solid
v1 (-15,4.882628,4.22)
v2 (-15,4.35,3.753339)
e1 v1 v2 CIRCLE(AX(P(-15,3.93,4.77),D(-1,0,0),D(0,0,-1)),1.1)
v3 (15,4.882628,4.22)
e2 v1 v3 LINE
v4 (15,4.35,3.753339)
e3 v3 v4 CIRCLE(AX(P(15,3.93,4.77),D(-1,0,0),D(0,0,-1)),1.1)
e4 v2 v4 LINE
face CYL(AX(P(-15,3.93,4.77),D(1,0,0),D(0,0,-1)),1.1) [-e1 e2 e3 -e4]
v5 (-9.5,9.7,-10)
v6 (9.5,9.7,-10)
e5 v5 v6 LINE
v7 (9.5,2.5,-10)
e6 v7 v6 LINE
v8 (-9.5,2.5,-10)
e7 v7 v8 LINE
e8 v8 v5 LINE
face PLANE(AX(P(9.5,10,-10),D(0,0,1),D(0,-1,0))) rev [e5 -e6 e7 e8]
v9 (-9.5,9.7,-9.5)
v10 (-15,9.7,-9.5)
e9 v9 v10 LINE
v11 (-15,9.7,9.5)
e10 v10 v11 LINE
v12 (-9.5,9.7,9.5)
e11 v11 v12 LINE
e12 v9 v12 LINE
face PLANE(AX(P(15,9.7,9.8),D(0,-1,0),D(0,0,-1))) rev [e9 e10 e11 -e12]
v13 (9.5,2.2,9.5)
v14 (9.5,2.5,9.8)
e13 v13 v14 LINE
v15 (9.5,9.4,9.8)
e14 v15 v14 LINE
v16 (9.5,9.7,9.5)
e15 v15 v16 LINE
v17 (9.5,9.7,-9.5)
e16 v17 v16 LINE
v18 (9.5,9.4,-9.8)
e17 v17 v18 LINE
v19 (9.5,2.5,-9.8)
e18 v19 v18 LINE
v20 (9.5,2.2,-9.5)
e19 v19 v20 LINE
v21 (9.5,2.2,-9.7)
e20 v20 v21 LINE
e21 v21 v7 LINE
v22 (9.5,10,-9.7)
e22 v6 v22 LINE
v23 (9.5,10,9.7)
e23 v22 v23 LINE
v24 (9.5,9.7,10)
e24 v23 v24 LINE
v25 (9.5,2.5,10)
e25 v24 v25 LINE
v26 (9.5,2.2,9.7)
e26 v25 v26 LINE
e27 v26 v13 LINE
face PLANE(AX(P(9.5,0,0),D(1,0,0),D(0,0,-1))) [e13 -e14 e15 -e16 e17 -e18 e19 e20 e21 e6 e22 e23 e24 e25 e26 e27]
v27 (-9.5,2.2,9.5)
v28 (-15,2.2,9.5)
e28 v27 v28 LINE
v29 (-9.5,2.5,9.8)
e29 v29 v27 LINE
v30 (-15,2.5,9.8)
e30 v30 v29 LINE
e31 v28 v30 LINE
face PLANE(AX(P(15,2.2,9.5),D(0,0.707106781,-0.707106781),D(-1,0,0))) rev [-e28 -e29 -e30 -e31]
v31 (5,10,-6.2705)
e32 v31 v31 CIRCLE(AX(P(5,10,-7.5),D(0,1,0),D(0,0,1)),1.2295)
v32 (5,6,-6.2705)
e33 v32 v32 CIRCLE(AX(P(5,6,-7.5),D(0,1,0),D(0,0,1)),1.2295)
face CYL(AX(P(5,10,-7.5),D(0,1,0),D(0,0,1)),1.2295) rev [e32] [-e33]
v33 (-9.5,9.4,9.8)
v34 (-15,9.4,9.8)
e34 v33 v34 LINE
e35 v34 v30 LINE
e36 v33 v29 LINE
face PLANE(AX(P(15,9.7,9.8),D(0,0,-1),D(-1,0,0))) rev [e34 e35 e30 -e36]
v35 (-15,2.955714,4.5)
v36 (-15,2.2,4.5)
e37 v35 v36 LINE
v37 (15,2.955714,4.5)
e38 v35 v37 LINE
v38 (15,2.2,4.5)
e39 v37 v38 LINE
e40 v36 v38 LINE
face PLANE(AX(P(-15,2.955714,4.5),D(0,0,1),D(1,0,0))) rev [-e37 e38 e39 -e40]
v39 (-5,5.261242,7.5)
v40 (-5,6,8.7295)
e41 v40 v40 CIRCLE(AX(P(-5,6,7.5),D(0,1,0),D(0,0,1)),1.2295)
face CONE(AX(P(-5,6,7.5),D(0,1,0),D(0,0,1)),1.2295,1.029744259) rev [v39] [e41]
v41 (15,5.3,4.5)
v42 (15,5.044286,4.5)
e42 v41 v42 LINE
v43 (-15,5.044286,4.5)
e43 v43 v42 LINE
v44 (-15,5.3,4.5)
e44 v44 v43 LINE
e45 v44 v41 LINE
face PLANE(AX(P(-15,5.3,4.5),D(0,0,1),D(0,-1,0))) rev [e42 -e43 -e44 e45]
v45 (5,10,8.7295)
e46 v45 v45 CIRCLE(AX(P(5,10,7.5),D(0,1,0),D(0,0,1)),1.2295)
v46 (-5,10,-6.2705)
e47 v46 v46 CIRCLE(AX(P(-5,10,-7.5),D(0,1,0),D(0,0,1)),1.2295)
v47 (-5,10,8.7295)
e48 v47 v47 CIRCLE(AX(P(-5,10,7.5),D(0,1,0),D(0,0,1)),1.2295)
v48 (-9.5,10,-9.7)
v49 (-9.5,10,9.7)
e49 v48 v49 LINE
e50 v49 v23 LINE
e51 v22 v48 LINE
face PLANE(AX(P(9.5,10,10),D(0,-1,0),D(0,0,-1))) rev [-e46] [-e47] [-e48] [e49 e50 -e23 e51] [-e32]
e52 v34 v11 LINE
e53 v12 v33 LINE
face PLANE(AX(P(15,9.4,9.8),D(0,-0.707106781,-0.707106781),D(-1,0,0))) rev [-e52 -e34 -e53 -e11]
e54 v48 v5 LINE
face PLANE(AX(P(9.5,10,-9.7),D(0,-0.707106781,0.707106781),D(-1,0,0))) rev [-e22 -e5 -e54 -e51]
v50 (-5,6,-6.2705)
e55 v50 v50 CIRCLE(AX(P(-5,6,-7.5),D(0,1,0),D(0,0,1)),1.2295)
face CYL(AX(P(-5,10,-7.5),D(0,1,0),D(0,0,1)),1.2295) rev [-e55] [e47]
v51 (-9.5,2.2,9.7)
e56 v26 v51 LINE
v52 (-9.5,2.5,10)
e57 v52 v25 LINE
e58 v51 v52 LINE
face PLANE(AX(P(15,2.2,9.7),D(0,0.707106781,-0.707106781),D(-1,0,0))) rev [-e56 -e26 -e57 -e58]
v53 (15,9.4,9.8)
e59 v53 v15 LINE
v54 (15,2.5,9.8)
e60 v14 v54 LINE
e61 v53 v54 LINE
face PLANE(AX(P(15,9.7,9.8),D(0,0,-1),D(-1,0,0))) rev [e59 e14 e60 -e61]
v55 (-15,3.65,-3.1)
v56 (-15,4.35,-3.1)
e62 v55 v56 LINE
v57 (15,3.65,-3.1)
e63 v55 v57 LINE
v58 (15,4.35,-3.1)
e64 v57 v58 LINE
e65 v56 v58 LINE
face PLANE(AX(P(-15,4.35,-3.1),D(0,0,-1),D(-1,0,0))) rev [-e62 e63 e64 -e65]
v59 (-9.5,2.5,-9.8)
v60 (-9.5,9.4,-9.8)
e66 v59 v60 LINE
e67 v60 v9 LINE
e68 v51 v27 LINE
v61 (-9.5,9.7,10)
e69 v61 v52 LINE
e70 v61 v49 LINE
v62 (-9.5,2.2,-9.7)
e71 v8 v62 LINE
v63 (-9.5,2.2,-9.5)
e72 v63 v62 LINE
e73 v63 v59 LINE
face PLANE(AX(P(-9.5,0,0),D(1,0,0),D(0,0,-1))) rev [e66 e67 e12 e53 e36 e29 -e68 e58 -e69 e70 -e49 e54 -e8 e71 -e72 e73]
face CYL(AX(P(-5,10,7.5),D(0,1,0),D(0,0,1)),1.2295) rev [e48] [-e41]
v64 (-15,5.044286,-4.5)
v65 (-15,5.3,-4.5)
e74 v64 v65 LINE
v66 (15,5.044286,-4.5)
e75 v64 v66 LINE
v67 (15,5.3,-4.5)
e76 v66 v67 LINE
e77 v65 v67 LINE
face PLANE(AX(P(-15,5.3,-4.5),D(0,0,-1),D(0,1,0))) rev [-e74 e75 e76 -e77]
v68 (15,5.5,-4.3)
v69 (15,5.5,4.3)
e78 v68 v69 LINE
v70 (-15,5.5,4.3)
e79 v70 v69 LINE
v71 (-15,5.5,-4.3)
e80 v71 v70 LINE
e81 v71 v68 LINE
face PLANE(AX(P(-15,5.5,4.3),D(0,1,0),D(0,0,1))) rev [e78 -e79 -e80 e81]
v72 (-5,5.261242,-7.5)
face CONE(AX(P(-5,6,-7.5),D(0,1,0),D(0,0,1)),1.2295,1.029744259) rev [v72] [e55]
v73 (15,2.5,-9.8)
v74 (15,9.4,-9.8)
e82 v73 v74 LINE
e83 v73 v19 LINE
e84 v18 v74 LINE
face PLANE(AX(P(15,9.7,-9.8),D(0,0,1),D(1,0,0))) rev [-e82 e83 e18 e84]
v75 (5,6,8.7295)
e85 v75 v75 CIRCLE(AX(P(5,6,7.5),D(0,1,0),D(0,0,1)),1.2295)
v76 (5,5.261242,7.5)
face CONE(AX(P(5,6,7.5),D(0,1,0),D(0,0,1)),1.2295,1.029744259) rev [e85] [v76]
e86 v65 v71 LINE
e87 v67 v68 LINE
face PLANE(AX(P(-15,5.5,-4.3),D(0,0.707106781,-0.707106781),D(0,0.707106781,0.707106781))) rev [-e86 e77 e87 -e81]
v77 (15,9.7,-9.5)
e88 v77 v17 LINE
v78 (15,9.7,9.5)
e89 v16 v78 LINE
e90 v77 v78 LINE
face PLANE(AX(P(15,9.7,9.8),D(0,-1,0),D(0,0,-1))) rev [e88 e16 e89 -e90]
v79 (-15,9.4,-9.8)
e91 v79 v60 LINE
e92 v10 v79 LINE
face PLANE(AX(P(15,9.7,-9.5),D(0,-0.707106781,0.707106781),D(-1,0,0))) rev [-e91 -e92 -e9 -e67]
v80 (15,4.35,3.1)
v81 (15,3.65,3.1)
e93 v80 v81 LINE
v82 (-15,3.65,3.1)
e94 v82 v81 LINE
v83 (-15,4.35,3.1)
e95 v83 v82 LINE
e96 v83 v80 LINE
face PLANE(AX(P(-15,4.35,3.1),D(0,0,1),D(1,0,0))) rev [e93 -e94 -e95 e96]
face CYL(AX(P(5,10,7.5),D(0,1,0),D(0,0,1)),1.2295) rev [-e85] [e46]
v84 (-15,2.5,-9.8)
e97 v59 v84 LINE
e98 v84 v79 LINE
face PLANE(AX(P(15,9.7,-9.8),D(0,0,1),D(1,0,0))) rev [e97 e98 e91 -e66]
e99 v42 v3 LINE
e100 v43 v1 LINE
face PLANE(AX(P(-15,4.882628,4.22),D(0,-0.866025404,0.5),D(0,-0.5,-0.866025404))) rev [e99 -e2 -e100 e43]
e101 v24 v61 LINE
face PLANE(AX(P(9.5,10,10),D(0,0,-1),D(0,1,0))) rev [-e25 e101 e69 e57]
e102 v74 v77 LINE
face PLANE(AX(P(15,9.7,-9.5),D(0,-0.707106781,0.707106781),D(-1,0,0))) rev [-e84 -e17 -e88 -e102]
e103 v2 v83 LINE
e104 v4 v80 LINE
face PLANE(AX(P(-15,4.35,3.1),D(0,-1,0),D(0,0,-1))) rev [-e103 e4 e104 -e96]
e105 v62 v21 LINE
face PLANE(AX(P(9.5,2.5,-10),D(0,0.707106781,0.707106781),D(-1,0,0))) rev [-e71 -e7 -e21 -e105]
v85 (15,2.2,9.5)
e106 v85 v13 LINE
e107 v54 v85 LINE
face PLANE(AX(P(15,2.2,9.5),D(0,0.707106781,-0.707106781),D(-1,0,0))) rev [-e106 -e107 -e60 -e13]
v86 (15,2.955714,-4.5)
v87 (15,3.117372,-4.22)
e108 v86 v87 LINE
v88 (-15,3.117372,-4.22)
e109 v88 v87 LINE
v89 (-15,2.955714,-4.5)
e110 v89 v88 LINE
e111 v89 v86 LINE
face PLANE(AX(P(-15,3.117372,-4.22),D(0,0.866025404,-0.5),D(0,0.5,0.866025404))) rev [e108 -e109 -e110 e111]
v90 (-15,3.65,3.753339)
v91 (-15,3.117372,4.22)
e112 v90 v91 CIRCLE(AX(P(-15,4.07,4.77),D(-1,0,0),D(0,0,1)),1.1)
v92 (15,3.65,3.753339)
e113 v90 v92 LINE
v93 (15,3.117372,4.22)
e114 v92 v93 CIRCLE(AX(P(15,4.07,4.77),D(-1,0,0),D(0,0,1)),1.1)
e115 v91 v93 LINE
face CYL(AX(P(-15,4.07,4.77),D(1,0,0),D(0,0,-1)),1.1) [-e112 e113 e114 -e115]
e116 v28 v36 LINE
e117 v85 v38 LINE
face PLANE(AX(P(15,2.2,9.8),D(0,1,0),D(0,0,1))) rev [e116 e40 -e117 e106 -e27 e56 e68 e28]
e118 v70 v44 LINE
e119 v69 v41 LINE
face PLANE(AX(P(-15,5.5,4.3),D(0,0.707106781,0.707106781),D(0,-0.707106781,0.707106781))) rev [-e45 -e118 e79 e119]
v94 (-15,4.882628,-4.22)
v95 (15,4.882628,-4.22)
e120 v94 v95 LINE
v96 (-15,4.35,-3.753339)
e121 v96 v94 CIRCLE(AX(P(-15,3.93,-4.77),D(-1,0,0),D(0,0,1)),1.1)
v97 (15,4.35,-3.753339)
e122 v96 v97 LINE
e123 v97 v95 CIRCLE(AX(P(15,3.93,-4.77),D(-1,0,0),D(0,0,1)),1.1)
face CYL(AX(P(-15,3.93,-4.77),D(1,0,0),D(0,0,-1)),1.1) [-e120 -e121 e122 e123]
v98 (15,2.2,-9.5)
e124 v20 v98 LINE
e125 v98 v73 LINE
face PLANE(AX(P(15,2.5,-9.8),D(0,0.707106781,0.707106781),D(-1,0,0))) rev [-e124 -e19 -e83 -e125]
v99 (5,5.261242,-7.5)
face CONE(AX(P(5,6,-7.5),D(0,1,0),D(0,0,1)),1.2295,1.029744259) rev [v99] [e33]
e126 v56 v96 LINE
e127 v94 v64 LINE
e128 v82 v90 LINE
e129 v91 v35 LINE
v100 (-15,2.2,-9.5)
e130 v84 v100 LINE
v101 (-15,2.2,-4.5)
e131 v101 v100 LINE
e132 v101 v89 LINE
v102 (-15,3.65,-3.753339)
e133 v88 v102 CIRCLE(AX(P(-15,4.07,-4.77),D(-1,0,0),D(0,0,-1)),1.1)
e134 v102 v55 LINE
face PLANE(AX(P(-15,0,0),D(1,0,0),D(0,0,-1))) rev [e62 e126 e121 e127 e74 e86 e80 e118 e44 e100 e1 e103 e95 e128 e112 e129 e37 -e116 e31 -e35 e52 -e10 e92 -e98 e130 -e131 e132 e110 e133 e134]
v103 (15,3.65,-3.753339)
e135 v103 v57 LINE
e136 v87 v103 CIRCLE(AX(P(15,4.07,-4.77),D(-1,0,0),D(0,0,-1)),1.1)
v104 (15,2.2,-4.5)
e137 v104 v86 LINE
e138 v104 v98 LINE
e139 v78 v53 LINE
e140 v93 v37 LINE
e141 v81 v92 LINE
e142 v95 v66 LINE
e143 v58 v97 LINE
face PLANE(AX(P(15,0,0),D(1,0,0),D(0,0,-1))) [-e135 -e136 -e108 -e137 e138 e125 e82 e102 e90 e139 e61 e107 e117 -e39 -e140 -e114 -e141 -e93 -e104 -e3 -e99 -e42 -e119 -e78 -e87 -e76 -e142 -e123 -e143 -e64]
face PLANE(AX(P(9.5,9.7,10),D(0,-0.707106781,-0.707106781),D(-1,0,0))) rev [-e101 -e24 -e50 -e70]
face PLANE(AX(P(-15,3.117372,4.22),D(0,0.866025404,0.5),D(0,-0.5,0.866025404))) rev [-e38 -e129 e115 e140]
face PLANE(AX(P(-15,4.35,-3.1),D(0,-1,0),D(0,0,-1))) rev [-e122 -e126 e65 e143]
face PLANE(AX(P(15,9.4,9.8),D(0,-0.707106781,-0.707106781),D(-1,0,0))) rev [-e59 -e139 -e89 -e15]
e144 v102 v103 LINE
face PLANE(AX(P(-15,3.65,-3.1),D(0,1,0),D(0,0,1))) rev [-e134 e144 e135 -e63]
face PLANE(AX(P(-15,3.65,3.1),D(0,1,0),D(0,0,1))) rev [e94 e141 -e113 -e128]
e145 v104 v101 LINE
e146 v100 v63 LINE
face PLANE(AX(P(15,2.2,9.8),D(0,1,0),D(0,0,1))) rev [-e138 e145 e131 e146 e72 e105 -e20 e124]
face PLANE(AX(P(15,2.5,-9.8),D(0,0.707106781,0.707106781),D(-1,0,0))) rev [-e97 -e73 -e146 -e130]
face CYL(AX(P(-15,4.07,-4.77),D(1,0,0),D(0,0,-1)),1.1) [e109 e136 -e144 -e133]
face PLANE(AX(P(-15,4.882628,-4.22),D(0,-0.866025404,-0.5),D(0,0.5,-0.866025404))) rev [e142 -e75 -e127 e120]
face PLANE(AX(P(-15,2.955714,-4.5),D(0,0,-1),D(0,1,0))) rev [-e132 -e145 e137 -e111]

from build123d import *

# Parameters (mm, degrees)
SKETCH1_W               = 19.6
SKETCH1_H               = 7.5
BOSS_EXTRUDE1_DEPTH     = 15
SKETCH2_W               = 20
SKETCH2_H               = 7.8
BOSS_EXTRUDE2_DEPTH     = 9.5
CUT_EXTRUDE2_DEPTH      = 21.615528128
CUT_EXTRUDE2_DEPTH_BACK = 21.615528128
CHAMFER1_SIZE           = 0.3
CHAMFER2_SIZE           = 0.3
CHAMFER3_SIZE           = 0.3
CHAMFER4_SIZE           = 0.3
LPATTERN2_COUNT         = 2
LPATTERN2_PITCH         = 10
LPATTERN2_COUNT_DIR2    = 2
LPATTERN2_PITCH_DIR2    = 15


with BuildPart() as part:
    # Sketch1 → Boss-Extrude1 (new, symmetric)
    with BuildSketch(Plane(origin=(0, 0, 0), x_dir=(0, 0, -1), z_dir=(1, 0, 0))):
        with Locations((0, 5.95)):
            Rectangle(SKETCH1_W, SKETCH1_H)
    extrude(amount=BOSS_EXTRUDE1_DEPTH, both=True)

    # Sketch2 → Boss-Extrude2 (add, symmetric)
    with BuildSketch(Plane(origin=(0, 0, 0), x_dir=(0, 0, -1), z_dir=(1, 0, 0))):
        with Locations((0, 6.1)):
            Rectangle(SKETCH2_W, SKETCH2_H)
    extrude(amount=BOSS_EXTRUDE2_DEPTH, both=True)

    # Sketch4 → Cut-Extrude2 (cut, two sides: drawn at the far end of the back side and taken through both)
    with BuildSketch(Plane(origin=(0, 0, 0), x_dir=(0, 0, -1), z_dir=(1, 0, 0)).offset(-CUT_EXTRUDE2_DEPTH_BACK)):
        with BuildLine():
            Line((-4.3, 5.5), (4.3, 5.5))
            Line((4.3, 5.5), (4.5, 5.3))
            Line((4.5, 5.3), (4.5, 5.04428602))
            Line((4.5, 5.04428602), (4.22, 4.882627944))
            ThreePointArc((4.22, 4.882627944), (3.942636741, 4.654893122), (3.753338798, 4.35))
            Line((3.753338798, 4.35), (3.1, 4.35))
            Line((3.1, 4.35), (3.1, 3.65))
            Line((3.1, 3.65), (3.753338798, 3.65))
            ThreePointArc((3.753338798, 3.65), (3.942636741, 3.345106878), (4.22, 3.117372056))
            Line((4.22, 3.117372056), (4.5, 2.95571398))
            Line((4.5, 2.95571398), (4.5, 0))
            Line((4.5, 0), (-4.5, 0))
            Line((-4.5, 0), (-4.5, 2.95571398))
            Line((-4.5, 2.95571398), (-4.22, 3.117372056))
            ThreePointArc((-4.22, 3.117372056), (-3.942636741, 3.345106878), (-3.753338798, 3.65))
            Line((-3.753338798, 3.65), (-3.1, 3.65))
            Line((-3.1, 3.65), (-3.1, 4.35))
            Line((-3.1, 4.35), (-3.753338798, 4.35))
            ThreePointArc((-3.753338798, 4.35), (-3.942636741, 4.654893122), (-4.22, 4.882627944))
            Line((-4.22, 4.882627944), (-4.5, 5.04428602))
            Line((-4.5, 5.04428602), (-4.5, 5.3))
            Line((-4.5, 5.3), (-4.3, 5.5))
        make_face()
    extrude(amount=CUT_EXTRUDE2_DEPTH + CUT_EXTRUDE2_DEPTH_BACK, mode=Mode.SUBTRACT)

    # Chamfer1
    chamfer1_edges = [part.edges().sort_by_distance(p)[0] for p in [
        (-12.25, 9.7, 9.8),
        (-12.25, 9.7, -9.8),
        (12.25, 9.7, 9.8),
        (12.25, 9.7, -9.8),
    ]]
    chamfer(chamfer1_edges, length=CHAMFER1_SIZE)

    # Chamfer2
    chamfer2_edges = [part.edges().sort_by_distance(p)[0] for p in [
        (0, 10, 10),
        (0, 10, -10),
    ]]
    chamfer(chamfer2_edges, length=CHAMFER2_SIZE)

    # Chamfer3
    chamfer3_edges = [part.edges().sort_by_distance(p)[0] for p in [
        (-12.25, 2.2, -9.8),
        (-12.25, 2.2, 9.8),
        (12.25, 2.2, -9.8),
        (12.25, 2.2, 9.8),
    ]]
    chamfer(chamfer3_edges, length=CHAMFER3_SIZE)

    # Chamfer4
    chamfer4_edges = [part.edges().sort_by_distance(p)[0] for p in [
        (0, 2.2, 10),
        (0, 2.2, -10),
    ]]
    chamfer(chamfer4_edges, length=CHAMFER4_SIZE)

    # Sketch7 → Tap2 (revolve, cut)
    with BuildSketch(Plane(origin=(-5, 10, -7.5), x_dir=(0, 0, 1), z_dir=(1, 0, 0))):
        Polygon((0, 0), (0, 4.738758131), (1.2295, 4), (1.2295, 0), align=None)
    tap2 = revolve(axis=Axis((-5, 10, -7.5), (0, -1, 0)), mode=Mode.SUBTRACT)

    # LPattern2: Tap2 2 × 2
    with Locations(*[(i * LPATTERN2_PITCH, 0, j * LPATTERN2_PITCH_DIR2) for i in range(LPATTERN2_COUNT) for j in range(LPATTERN2_COUNT_DIR2) if (i, j) != (0, 0)]):
        add(tap2, mode=Mode.SUBTRACT)


solid = part.part
